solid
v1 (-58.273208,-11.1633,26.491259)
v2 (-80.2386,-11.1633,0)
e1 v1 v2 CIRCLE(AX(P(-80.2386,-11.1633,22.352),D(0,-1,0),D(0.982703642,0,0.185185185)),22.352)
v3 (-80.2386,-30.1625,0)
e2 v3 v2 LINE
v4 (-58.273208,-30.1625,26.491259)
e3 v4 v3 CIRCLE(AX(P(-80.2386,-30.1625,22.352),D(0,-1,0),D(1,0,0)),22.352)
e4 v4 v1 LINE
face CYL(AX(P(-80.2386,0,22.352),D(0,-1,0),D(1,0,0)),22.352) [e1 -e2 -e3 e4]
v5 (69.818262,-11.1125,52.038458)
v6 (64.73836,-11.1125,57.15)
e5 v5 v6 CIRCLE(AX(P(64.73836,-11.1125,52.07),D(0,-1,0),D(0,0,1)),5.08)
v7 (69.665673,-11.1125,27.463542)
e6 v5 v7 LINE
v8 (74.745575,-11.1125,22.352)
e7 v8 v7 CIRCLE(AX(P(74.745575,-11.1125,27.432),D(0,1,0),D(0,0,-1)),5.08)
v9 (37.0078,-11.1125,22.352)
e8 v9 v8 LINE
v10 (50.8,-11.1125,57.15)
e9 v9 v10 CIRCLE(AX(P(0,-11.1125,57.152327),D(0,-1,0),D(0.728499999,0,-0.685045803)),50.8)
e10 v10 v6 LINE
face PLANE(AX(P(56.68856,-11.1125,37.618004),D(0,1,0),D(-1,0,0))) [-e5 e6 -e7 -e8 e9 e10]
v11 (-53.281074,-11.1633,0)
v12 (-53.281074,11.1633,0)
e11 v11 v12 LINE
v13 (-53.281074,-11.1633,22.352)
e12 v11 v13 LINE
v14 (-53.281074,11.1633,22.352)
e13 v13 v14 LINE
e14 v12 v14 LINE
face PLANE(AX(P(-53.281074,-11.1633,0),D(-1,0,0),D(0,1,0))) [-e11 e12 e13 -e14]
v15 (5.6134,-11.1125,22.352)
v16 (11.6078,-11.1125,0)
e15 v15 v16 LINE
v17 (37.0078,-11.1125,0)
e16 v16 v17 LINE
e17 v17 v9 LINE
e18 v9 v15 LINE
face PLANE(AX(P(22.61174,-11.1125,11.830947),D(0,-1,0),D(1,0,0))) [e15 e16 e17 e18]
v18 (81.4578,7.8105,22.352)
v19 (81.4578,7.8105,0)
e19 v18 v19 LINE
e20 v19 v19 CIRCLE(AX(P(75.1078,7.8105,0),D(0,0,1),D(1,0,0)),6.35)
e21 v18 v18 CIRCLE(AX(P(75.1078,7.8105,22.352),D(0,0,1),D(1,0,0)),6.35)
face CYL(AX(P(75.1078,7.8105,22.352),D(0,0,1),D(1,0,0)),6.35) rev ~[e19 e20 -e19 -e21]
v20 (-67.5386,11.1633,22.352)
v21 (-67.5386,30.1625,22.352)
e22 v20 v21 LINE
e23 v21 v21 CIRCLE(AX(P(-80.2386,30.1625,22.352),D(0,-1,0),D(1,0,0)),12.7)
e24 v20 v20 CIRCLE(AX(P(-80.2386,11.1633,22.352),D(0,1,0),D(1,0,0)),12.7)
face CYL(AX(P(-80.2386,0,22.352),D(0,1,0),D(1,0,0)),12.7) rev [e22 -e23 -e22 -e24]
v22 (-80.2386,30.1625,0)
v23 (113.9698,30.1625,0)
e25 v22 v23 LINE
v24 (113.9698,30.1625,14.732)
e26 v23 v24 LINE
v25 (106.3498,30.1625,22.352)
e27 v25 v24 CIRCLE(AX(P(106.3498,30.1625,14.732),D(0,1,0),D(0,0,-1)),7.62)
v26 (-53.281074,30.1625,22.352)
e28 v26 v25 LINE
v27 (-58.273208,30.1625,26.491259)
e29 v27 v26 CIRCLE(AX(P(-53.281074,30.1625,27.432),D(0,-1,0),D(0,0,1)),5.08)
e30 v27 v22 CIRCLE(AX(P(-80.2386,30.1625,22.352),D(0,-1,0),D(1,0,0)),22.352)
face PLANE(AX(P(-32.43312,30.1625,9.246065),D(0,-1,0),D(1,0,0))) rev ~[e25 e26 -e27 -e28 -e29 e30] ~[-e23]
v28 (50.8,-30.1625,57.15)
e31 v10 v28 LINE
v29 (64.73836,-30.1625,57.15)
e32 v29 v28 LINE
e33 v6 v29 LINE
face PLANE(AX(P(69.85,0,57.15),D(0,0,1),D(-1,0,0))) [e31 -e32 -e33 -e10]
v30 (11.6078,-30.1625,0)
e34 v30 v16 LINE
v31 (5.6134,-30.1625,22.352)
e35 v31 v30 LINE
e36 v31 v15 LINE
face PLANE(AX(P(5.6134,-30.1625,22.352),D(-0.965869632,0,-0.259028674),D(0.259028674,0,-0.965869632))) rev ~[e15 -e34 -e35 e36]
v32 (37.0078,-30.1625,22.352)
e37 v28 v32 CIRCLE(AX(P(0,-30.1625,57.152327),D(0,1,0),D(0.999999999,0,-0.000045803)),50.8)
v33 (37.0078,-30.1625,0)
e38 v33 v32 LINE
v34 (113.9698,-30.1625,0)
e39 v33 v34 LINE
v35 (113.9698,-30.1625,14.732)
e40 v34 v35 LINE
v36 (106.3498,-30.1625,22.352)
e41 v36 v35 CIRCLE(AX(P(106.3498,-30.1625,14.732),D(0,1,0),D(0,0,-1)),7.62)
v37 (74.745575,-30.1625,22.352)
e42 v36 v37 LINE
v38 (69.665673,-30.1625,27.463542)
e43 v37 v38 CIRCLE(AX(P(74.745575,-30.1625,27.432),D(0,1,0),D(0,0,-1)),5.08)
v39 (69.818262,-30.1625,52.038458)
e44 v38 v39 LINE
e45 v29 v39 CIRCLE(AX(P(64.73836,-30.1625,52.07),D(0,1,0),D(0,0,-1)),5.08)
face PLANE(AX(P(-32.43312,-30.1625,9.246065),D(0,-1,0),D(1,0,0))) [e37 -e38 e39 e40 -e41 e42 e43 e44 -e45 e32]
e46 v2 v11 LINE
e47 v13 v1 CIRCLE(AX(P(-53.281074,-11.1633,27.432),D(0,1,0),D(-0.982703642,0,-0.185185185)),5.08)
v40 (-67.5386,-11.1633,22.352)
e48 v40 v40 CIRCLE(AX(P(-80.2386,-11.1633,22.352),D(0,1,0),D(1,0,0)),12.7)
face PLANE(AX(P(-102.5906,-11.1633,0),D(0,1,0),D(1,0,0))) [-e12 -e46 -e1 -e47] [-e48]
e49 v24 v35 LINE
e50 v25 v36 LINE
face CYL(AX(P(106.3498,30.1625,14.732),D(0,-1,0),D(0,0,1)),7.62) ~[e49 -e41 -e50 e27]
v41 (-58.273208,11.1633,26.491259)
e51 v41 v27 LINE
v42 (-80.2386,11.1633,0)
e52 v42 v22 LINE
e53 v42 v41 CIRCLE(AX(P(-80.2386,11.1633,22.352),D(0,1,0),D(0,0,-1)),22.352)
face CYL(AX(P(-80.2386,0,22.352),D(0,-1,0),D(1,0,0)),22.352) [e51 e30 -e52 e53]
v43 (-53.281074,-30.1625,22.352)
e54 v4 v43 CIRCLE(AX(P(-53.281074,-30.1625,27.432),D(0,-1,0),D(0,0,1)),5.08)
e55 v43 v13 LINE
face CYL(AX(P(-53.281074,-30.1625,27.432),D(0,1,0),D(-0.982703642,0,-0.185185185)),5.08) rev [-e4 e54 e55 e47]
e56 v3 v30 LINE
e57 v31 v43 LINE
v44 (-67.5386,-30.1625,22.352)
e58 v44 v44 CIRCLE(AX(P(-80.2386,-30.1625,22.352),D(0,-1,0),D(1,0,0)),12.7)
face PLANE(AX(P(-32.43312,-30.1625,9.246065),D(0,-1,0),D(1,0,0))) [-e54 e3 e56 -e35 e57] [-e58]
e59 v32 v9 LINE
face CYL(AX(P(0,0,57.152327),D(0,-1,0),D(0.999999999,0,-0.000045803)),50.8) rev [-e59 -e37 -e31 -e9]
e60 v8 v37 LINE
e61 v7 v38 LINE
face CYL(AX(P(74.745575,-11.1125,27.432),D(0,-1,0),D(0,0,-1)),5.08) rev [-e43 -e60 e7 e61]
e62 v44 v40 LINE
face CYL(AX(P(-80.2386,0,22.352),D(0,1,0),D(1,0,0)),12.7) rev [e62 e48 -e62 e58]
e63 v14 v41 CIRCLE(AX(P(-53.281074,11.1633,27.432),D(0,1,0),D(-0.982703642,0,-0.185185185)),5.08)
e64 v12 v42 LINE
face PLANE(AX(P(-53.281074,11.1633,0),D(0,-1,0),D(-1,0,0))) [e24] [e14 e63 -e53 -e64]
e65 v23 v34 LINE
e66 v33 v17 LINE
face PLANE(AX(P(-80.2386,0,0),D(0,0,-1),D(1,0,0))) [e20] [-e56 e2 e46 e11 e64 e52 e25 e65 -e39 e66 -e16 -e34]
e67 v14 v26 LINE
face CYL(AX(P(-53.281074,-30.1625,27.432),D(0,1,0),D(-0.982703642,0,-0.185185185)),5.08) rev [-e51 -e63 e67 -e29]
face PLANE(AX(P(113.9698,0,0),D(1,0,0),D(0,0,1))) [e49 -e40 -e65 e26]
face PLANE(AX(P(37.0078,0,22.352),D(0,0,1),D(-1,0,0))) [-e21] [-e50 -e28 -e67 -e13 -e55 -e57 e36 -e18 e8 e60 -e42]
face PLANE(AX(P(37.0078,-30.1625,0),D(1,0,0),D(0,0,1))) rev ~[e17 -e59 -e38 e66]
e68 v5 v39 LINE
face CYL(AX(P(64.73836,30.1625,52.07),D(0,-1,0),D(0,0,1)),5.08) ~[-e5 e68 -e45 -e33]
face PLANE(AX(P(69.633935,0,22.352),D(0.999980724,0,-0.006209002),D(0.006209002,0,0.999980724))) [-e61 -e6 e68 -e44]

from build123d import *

# Parameters (mm, degrees)
F0_R      = 12.7
F1_DEPTH  = 30.1625
F4_R      = 5.08
F5_R      = 7.62
F6_R      = 5.08
F7_DEPTH  = 41.275
F9_DEPTH  = 19.05
F10_R     = 5.08
F11_W     = 22.352
F11_H     = 22.3266
F11_W_2   = 21.9653917967
F11_W_3   = 4.9921344993
F12_DEPTH = 57.151
F13_R     = 6.35
F14_DEPTH = 22.353


# Not quite as in the source:
# - a feature names something its author has since deleted; it is built from what else it names


with BuildPart() as f1:
    # F0 (on Front) → F1 (new body, symmetric)
    with BuildSketch(Plane.XZ):
        with BuildLine():
            Line((11.6077999467, 0), (5.6133999467, 22.352))
            Line((5.6133999467, 22.352), (-57.8866000533, 22.352))
            ThreePointArc((-57.8866000533, 22.352), (-64.4333492802, 6.5467492269), (-80.2386000533, 0))
            Line((-80.2386000533, 0), (11.6077999467, 0))
        make_face()
        Polygon((69.6339349389, 22.352), (37.0077999467, 22.352), (37.0077999467, 0), (69.4951486566, 0), align=None)
        Polygon((113.9697999467, 22.352), (69.6339349389, 22.352), (69.4951486566, 0), (113.9697999467, 0), align=None)
        with BuildLine():
            ThreePointArc((-80.2386000533, 0), (-64.4333492802, 6.5467492269), (-57.8866000533, 22.352))
            ThreePointArc((-57.8866000533, 22.352), (-96.0438508264, 38.1572507731), (-80.2386000533, 0))
        make_face()
        with Locations((-80.2386000533, 22.352)):
            Circle(F0_R, mode=Mode.SUBTRACT)
        Polygon((37.0077999467, 0), (37.0077999467, 22.352), (5.6133999467, 22.352), (11.6077999467, 0), align=None)
        with BuildLine():
            ThreePointArc((50.7999999467, 57.15), (47.2258153083, 38.4343576341), (37.0077999467, 22.352))
            Line((37.0077999467, 22.352), (69.6339349389, 22.352))
            Line((69.6339349389, 22.352), (69.8499999467, 57.15))
            Line((69.8499999467, 57.15), (50.7999999467, 57.15))
        make_face()
    extrude(amount=F1_DEPTH, both=True)

    # F4
    f4_edges = [f1.edges().sort_by_distance(p)[0] for p in [
        (69.85, 0, 57.15),
    ]]
    fillet(f4_edges, radius=F4_R)

    # F5
    f5_edges = [f1.edges().sort_by_distance(p)[0] for p in [
        (113.9698, 0, 22.352),
    ]]
    fillet(f5_edges, radius=F5_R)

    # F6
    f6_edges = [f1.edges().sort_by_distance(p)[0] for p in [
        (-57.8866, 0, 22.352),
    ]]
    fillet(f6_edges, radius=F6_R)

    # F3 (on face) → F7 (cut)
    with BuildSketch(Plane(origin=(0, 30.1625, 0), x_dir=(-1, 0, 0), z_dir=(0, 1, 0))):
        with BuildLine():
            Line((-69.8499999467, 57.15), (-69.6339349389, 22.352))
            Line((-69.6339349389, 22.352), (-37.0077999467, 22.352))
            ThreePointArc((-37.0077999467, 22.352), (-47.2258153083, 38.4343576341), (-50.7999999467, 57.15))
            Line((-50.7999999467, 57.15), (-69.8499999467, 57.15))
        make_face()
    extrude(amount=-F7_DEPTH, mode=Mode.SUBTRACT)

    # F2 (on face) → F9 (cut)
    with BuildSketch(Plane.XZ.offset(30.1625)):
        Polygon((37.0077999467, 22.352), (5.6133999467, 22.352), (11.6077999467, 0), (37.0077999467, 0), align=None)
    extrude(amount=-F9_DEPTH, mode=Mode.SUBTRACT)

    # F10
    f10_edges = [f1.edges().sort_by_distance(p)[0] for p in [
        (69.633935, -20.6375, 22.352),
    ]]
    fillet(f10_edges, radius=F10_R)

    # F11 (on Top) → F12 (cut, through all)
    with BuildSketch(Plane.XY):
        with Locations((-91.4146000533, 0)):
            Rectangle(F11_W, F11_H)
        with Locations((-69.2559041549, 0)):
            Rectangle(F11_W_2, F11_H)
        with Locations((-55.7771410069, 0)):
            Rectangle(F11_W_3, F11_H)
    extrude(amount=F12_DEPTH, mode=Mode.SUBTRACT)

    # F13 (on face) → F14 (cut, through all)
    with BuildSketch(Plane.XY.offset(22.352)):
        with Locations((75.1077999467, 7.8105)):
            Circle(F13_R)
    extrude(amount=-F14_DEPTH, mode=Mode.SUBTRACT)


solid = f1.part
